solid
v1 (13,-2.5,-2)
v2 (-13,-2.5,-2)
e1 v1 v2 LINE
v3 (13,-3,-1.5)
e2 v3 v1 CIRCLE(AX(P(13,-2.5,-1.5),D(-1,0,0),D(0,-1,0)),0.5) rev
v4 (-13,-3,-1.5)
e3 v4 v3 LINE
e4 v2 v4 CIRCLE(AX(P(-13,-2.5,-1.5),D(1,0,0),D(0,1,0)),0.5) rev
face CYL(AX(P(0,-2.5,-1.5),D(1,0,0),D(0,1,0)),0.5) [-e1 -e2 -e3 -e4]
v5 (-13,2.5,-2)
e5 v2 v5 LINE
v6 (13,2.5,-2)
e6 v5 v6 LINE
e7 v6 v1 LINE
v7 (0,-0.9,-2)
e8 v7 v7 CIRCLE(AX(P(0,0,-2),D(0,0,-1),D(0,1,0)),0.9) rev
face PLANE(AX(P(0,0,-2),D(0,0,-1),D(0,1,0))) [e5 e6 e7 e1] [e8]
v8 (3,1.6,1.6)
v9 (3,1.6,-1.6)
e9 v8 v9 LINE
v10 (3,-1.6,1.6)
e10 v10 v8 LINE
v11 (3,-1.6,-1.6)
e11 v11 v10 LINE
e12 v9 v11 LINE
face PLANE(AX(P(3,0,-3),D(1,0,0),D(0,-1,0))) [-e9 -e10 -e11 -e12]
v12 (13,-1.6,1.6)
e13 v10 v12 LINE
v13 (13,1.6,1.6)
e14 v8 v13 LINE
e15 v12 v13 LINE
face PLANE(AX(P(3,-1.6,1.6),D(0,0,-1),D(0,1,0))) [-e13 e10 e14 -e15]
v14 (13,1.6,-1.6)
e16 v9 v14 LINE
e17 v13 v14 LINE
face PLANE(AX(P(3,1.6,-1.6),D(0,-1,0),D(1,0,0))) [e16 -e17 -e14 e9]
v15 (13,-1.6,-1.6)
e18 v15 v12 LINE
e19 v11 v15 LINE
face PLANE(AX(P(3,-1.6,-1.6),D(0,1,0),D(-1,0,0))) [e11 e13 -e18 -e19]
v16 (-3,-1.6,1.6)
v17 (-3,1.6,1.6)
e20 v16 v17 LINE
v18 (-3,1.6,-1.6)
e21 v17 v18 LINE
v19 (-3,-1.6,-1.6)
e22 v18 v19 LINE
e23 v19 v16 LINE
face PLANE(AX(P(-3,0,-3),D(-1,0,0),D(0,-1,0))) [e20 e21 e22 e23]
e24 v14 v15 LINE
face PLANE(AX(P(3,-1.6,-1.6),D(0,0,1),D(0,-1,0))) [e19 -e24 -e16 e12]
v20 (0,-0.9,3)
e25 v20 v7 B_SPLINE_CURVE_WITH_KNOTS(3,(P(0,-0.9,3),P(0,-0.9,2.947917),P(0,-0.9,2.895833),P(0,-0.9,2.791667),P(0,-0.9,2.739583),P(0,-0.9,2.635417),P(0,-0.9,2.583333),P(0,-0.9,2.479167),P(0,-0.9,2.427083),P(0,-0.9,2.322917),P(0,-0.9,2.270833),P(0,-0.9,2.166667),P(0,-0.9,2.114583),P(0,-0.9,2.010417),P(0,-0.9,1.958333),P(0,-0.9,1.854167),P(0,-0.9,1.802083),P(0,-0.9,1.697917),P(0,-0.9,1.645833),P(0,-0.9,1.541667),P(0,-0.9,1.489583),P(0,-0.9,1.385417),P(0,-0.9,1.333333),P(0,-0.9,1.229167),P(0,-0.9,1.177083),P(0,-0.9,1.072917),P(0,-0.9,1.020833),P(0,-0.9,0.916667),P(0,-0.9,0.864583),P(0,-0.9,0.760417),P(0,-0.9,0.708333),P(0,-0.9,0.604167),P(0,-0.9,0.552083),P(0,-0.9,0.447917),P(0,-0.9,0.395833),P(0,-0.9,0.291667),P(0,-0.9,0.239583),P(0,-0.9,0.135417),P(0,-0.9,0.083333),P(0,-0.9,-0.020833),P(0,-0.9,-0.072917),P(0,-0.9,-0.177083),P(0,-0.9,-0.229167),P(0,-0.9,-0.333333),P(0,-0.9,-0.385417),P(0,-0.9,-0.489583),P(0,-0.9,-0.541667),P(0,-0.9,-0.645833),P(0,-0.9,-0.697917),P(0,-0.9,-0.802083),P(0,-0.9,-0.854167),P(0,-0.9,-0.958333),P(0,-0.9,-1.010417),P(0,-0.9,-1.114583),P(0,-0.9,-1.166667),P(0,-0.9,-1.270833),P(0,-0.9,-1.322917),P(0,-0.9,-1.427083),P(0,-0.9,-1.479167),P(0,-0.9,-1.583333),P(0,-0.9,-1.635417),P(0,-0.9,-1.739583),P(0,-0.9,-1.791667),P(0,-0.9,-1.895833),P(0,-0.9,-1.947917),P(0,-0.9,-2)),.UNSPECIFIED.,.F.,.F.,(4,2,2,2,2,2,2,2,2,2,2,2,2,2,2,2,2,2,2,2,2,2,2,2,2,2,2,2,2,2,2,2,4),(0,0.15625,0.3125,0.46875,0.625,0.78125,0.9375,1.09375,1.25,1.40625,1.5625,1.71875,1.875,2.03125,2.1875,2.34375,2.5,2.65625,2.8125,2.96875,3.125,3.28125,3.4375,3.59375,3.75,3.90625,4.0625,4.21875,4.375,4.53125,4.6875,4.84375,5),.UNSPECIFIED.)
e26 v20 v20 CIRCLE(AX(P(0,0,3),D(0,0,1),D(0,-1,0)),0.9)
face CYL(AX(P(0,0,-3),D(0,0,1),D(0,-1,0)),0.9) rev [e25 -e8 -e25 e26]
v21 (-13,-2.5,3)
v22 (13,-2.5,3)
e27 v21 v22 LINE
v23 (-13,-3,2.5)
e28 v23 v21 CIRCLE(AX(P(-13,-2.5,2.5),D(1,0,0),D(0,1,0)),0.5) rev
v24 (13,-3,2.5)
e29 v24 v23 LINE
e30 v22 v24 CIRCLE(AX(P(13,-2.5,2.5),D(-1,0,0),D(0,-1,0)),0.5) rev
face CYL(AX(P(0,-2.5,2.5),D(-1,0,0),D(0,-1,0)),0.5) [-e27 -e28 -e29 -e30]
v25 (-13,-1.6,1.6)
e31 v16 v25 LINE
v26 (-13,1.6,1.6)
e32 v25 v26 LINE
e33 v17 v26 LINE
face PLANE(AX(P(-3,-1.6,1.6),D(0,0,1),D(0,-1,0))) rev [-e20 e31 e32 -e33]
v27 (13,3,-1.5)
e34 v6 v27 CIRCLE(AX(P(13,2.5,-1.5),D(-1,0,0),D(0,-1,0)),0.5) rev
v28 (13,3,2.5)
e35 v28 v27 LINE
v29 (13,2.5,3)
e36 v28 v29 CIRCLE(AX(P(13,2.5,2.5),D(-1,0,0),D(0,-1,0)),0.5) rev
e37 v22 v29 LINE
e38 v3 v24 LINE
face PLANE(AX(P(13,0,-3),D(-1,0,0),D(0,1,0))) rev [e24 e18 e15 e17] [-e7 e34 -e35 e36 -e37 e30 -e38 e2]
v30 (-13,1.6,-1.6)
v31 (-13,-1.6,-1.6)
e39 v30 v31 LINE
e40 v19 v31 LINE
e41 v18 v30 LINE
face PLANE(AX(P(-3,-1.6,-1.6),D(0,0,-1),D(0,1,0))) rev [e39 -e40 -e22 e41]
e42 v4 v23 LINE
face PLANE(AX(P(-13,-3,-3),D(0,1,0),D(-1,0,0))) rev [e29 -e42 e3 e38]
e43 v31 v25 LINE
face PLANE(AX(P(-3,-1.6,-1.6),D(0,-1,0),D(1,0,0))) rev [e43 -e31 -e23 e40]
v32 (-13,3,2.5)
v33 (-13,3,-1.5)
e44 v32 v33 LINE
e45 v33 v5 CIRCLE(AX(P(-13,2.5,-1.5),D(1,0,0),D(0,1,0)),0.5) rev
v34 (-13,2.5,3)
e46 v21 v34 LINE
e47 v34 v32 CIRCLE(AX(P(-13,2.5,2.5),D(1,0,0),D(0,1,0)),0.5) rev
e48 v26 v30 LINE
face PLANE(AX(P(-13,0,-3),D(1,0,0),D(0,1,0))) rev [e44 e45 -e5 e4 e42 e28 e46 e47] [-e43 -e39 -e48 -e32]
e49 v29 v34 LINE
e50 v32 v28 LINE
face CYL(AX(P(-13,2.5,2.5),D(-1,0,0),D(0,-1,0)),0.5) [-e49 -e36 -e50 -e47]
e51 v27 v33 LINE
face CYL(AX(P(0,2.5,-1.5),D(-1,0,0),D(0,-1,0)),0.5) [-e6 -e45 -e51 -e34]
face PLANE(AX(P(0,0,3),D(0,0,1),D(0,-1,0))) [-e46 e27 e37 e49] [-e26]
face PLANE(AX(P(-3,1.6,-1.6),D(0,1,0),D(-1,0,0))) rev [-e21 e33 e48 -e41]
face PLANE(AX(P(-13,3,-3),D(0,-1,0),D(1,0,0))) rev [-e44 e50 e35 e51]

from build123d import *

# Parameters (mm, degrees)
SKETCH3_R             = 3
BOSS_EXTRUDE1_DEPTH   = 6
BOSS_EXTRUDE2_START   = -3
SKETCH4_W             = 6
SKETCH4_H             = 6
BOSS_EXTRUDE2_DEPTH   = 13
SKETCH5_W             = 3.2
SKETCH5_H             = 3.2
CUT_EXTRUDE1_DEPTH    = 10
SKETCH6_R             = 0.9
CUT_EXTRUDE2_DEPTH    = 15.628738838
MIRROR2_DEPTH         = 6
MIRROR2_2_OUTLINE_W   = 10
MIRROR2_2_OUTLINE_H   = 3.2
MIRROR2_2_DEPTH       = 1.4
MIRROR2_START         = 4.6
MIRROR2_3_OUTLINE_W   = 10
MIRROR2_3_OUTLINE_H   = 3.2
MIRROR2_3_DEPTH       = 1.4
SKETCH8_W             = 26
SKETCH8_H             = 6
CUT_EXTRUDE3_DEPTH    = 1
FILLET1_R             = 0.5
BODY_MOVE_COPY1_ANGLE = 90


with BuildPart() as part:
    # Sketch3 → Boss-Extrude1 (new body)
    with BuildSketch(Plane(origin=(0, 0, 0), x_dir=(1, 0, 0), z_dir=(0, 1, 0))):
        with Locations(Location((0, 0, 0), (0, 0, 270))):
            Circle(SKETCH3_R)
    extrude(amount=BOSS_EXTRUDE1_DEPTH)

    # Sketch4 → Boss-Extrude2 (add)
    with BuildSketch(Plane.ZY.offset(3).offset(BOSS_EXTRUDE2_START)):
        with Locations((0, 3)):
            Rectangle(SKETCH4_W, SKETCH4_H)
    extrude(amount=BOSS_EXTRUDE2_DEPTH)

    # Sketch5 → Cut-Extrude1 (cut)
    with BuildSketch(Plane.ZY.offset(13)):
        with Locations((0, 3)):
            Rectangle(SKETCH5_W, SKETCH5_H)
    extrude(amount=-CUT_EXTRUDE1_DEPTH, mode=Mode.SUBTRACT)

    # Sketch6 → Cut-Extrude2 (cut, through all)
    with BuildSketch(Plane(origin=(0, 6, 0), x_dir=(1, 0, 0), z_dir=(0, 1, 0))):
        with Locations(Location((0, 0, 0), (0, 0, 270))):
            Circle(SKETCH6_R)
    extrude(amount=-CUT_EXTRUDE2_DEPTH, mode=Mode.SUBTRACT)

    # Mirror2: read off the stored shape, not the designer's step
    # Mirror2 outline → Mirror2 (add)
    with BuildSketch(Plane(origin=(0, 0, 0), x_dir=(1, 0, 0), z_dir=(0, 1, 0))):
        with BuildLine():
            Line((13, 1.6), (13, 3))
            Line((13, 3), (0, 3))
            ThreePointArc((0, 3), (2.121320344, 2.121320344), (3, 0))
            Line((3, 0), (3, 1.6))
            Line((3, 1.6), (13, 1.6))
        make_face()
        with BuildLine():
            Line((13, -3), (13, -1.6))
            Line((13, -1.6), (3, -1.6))
            Line((3, -1.6), (3, 0))
            ThreePointArc((3, 0), (2.121320344, -2.121320344), (0, -3))
            Line((0, -3), (13, -3))
        make_face()
    extrude(amount=MIRROR2_DEPTH)

    # Mirror2 2 outline → Mirror2 2 (add)
    with BuildSketch(Plane(origin=(0, 0, 0), x_dir=(1, 0, 0), z_dir=(0, 1, 0))):
        with Locations((8, 0)):
            Rectangle(MIRROR2_2_OUTLINE_W, MIRROR2_2_OUTLINE_H)
    extrude(amount=MIRROR2_2_DEPTH)

    # Mirror2 3 outline → Mirror2 3 (add)
    with BuildSketch(Plane(origin=(0, 0, 0), x_dir=(1, 0, 0), z_dir=(0, 1, 0)).offset(MIRROR2_START)):
        with Locations((8, 0)):
            Rectangle(MIRROR2_3_OUTLINE_W, MIRROR2_3_OUTLINE_H)
    extrude(amount=MIRROR2_3_DEPTH)

    # Sketch8 → Cut-Extrude3 (cut)
    with BuildSketch(Plane.XZ):
        Rectangle(SKETCH8_W, SKETCH8_H)
    extrude(amount=-CUT_EXTRUDE3_DEPTH, mode=Mode.SUBTRACT)

    # Fillet1
    fillet1_edges = [part.edges().sort_by_distance(p)[0] for p in [
        (0, 1, 3),
        (0, 1, -3),
        (0, 6, 3),
        (0, 6, -3),
    ]]
    fillet(fillet1_edges, radius=FILLET1_R)


with BuildPart() as part_1:
    # Body-Move/Copy1: moved
    add(part.part.rotate(Axis((0, 3.5, 0), (1, 0, 0)), BODY_MOVE_COPY1_ANGLE))


with BuildPart() as part_2:
    # Body-Move/Copy2: read off the stored shape, not the designer's step
    # Body-Move/Copy2: moved
    add(part_1.part.moved(Location((0, -3.5, 0.5))))


solid = part_2.part
